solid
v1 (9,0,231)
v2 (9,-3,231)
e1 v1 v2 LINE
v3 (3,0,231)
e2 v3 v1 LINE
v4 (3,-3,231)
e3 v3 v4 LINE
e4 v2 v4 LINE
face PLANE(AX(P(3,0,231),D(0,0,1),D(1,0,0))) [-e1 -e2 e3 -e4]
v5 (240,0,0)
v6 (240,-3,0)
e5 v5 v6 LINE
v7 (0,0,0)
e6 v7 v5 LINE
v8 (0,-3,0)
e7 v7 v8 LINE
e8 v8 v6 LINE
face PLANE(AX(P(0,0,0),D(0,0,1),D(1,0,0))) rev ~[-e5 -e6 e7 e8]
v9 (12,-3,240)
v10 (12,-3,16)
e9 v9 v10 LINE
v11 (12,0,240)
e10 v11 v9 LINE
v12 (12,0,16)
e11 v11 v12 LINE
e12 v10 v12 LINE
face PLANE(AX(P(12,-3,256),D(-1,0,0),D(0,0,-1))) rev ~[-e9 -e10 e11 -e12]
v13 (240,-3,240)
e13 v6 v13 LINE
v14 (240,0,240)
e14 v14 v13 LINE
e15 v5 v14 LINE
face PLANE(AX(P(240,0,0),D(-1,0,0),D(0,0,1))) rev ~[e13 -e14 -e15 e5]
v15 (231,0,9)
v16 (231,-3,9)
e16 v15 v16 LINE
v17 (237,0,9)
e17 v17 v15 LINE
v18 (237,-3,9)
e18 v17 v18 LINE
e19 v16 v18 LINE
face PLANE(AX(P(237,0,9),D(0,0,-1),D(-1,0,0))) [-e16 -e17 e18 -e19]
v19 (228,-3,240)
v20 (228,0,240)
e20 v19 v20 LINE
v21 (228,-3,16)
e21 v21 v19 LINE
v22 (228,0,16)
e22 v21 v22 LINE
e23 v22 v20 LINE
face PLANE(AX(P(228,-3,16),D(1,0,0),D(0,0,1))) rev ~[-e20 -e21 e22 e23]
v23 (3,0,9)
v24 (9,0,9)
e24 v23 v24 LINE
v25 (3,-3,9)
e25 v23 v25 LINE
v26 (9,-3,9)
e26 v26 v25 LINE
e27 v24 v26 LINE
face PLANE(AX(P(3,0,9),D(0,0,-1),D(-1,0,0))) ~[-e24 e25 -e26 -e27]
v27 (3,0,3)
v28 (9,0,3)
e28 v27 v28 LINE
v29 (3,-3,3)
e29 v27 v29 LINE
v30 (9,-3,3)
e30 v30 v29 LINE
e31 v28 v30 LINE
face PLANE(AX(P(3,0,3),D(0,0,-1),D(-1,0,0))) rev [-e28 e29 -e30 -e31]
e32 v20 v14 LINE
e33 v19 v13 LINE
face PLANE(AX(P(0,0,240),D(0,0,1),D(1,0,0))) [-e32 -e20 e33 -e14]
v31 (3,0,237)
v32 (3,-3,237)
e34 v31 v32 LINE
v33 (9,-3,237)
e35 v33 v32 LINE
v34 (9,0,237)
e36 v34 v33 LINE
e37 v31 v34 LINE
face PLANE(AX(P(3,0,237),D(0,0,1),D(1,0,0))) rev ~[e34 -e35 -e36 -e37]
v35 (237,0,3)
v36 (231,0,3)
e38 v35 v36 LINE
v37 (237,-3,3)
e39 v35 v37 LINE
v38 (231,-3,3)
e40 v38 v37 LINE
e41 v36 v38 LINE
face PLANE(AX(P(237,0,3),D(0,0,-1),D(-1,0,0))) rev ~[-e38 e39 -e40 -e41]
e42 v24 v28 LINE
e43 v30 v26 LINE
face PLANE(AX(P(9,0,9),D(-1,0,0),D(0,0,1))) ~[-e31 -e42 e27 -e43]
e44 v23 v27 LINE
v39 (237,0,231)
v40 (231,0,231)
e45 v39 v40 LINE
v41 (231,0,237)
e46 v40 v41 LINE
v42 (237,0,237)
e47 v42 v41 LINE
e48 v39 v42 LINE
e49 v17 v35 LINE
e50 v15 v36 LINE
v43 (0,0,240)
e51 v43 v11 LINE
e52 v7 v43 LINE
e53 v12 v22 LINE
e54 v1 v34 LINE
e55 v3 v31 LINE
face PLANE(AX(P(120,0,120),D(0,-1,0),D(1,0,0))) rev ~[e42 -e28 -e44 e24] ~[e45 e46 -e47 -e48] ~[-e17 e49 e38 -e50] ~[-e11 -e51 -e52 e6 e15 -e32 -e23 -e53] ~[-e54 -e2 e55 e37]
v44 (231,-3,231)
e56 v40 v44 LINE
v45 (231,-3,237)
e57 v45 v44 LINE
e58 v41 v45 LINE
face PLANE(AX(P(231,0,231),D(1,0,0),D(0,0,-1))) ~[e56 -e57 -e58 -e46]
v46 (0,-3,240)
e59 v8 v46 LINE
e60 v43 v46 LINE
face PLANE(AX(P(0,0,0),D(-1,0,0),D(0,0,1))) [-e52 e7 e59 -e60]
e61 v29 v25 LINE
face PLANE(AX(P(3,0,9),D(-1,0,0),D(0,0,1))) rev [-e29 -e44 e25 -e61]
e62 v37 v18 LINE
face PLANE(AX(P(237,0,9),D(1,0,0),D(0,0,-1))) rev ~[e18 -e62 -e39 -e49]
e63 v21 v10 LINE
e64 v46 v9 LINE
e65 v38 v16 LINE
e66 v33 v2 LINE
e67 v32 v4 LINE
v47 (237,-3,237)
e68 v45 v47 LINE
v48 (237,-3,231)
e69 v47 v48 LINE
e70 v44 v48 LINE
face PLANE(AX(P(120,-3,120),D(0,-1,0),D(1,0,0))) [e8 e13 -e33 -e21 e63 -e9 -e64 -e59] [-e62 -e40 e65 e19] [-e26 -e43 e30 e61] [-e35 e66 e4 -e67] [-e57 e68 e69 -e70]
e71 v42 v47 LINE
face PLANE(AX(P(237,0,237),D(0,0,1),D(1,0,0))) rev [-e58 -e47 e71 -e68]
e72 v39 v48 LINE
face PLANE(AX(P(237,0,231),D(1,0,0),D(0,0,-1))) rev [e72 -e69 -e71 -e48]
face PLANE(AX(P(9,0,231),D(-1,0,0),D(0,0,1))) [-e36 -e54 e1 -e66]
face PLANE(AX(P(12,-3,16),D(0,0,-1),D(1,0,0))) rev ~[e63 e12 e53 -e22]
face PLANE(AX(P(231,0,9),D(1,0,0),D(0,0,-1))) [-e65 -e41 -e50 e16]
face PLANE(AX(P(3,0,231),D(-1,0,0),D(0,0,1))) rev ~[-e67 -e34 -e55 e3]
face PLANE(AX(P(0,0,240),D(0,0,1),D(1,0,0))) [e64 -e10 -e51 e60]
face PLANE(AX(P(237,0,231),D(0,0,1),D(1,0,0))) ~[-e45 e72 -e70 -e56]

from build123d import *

# Parameters (mm, degrees)
F1_W     = 240
F1_H     = 240
F1_W_2   = 6
F1_H_2   = 6
F1_W_3   = 208
F1_H_3   = 208
F2_DEPTH = 3
F3_DEPTH = 25
F8_W     = 216
F8_H     = 16
F8_W_2   = 208
F8_H_2   = 208
F9_DEPTH = 3.001


with BuildPart() as f2:
    # F1 (on Front) → F2 (new body)
    with BuildSketch(Plane.XZ):
        with Locations((120, 120)):
            Rectangle(F1_W, F1_H)
        with Locations((6, 234)):
            Rectangle(F1_W_2, F1_H_2, mode=Mode.SUBTRACT)
        with Locations((120, 120)):
            Rectangle(F1_W_3, F1_H_3, mode=Mode.SUBTRACT)
        with Locations((6, 234)):
            Rectangle(F1_W_2, F1_H_2)
    extrude(amount=F2_DEPTH)

    # F1 (on Front) → F3 (cut)
    with BuildSketch(Plane.XZ):
        with Locations((6, 234)):
            Rectangle(F1_W_2, F1_H_2)
    extrude(amount=F3_DEPTH, mode=Mode.SUBTRACT)

    # F5: F2 across plane


with BuildPart() as f2_1:
    add(f2.part)
    add(f2.part.mirror(Plane(origin=(120, -1.5, 120), x_dir=(0, -1, 0), z_dir=(-1, 0, 0))), mode=Mode.INTERSECT)

    # F7: F2 across plane


with BuildPart() as f2_2:
    add(f2_1.part)
    add(f2_1.part.mirror(Plane(origin=(120, -1.5, 120), x_dir=(1, 0, 0), z_dir=(0, 0, 1))), mode=Mode.INTERSECT)

    # F8 (on face) → F9 (cut, through all)
    with BuildSketch(Plane.XZ.offset(3)):
        with Locations((120, 248)):
            Rectangle(F8_W, F8_H)
        with Locations((120, 120)):
            Rectangle(F8_W_2, F8_H_2)
        Polygon((228, 240), (12, 240), (12, 16), (16, 16), (16, 224), (224, 224), (224, 16), (228, 16), align=None)
    extrude(amount=-F9_DEPTH, mode=Mode.SUBTRACT)


solid = f2_2.part
